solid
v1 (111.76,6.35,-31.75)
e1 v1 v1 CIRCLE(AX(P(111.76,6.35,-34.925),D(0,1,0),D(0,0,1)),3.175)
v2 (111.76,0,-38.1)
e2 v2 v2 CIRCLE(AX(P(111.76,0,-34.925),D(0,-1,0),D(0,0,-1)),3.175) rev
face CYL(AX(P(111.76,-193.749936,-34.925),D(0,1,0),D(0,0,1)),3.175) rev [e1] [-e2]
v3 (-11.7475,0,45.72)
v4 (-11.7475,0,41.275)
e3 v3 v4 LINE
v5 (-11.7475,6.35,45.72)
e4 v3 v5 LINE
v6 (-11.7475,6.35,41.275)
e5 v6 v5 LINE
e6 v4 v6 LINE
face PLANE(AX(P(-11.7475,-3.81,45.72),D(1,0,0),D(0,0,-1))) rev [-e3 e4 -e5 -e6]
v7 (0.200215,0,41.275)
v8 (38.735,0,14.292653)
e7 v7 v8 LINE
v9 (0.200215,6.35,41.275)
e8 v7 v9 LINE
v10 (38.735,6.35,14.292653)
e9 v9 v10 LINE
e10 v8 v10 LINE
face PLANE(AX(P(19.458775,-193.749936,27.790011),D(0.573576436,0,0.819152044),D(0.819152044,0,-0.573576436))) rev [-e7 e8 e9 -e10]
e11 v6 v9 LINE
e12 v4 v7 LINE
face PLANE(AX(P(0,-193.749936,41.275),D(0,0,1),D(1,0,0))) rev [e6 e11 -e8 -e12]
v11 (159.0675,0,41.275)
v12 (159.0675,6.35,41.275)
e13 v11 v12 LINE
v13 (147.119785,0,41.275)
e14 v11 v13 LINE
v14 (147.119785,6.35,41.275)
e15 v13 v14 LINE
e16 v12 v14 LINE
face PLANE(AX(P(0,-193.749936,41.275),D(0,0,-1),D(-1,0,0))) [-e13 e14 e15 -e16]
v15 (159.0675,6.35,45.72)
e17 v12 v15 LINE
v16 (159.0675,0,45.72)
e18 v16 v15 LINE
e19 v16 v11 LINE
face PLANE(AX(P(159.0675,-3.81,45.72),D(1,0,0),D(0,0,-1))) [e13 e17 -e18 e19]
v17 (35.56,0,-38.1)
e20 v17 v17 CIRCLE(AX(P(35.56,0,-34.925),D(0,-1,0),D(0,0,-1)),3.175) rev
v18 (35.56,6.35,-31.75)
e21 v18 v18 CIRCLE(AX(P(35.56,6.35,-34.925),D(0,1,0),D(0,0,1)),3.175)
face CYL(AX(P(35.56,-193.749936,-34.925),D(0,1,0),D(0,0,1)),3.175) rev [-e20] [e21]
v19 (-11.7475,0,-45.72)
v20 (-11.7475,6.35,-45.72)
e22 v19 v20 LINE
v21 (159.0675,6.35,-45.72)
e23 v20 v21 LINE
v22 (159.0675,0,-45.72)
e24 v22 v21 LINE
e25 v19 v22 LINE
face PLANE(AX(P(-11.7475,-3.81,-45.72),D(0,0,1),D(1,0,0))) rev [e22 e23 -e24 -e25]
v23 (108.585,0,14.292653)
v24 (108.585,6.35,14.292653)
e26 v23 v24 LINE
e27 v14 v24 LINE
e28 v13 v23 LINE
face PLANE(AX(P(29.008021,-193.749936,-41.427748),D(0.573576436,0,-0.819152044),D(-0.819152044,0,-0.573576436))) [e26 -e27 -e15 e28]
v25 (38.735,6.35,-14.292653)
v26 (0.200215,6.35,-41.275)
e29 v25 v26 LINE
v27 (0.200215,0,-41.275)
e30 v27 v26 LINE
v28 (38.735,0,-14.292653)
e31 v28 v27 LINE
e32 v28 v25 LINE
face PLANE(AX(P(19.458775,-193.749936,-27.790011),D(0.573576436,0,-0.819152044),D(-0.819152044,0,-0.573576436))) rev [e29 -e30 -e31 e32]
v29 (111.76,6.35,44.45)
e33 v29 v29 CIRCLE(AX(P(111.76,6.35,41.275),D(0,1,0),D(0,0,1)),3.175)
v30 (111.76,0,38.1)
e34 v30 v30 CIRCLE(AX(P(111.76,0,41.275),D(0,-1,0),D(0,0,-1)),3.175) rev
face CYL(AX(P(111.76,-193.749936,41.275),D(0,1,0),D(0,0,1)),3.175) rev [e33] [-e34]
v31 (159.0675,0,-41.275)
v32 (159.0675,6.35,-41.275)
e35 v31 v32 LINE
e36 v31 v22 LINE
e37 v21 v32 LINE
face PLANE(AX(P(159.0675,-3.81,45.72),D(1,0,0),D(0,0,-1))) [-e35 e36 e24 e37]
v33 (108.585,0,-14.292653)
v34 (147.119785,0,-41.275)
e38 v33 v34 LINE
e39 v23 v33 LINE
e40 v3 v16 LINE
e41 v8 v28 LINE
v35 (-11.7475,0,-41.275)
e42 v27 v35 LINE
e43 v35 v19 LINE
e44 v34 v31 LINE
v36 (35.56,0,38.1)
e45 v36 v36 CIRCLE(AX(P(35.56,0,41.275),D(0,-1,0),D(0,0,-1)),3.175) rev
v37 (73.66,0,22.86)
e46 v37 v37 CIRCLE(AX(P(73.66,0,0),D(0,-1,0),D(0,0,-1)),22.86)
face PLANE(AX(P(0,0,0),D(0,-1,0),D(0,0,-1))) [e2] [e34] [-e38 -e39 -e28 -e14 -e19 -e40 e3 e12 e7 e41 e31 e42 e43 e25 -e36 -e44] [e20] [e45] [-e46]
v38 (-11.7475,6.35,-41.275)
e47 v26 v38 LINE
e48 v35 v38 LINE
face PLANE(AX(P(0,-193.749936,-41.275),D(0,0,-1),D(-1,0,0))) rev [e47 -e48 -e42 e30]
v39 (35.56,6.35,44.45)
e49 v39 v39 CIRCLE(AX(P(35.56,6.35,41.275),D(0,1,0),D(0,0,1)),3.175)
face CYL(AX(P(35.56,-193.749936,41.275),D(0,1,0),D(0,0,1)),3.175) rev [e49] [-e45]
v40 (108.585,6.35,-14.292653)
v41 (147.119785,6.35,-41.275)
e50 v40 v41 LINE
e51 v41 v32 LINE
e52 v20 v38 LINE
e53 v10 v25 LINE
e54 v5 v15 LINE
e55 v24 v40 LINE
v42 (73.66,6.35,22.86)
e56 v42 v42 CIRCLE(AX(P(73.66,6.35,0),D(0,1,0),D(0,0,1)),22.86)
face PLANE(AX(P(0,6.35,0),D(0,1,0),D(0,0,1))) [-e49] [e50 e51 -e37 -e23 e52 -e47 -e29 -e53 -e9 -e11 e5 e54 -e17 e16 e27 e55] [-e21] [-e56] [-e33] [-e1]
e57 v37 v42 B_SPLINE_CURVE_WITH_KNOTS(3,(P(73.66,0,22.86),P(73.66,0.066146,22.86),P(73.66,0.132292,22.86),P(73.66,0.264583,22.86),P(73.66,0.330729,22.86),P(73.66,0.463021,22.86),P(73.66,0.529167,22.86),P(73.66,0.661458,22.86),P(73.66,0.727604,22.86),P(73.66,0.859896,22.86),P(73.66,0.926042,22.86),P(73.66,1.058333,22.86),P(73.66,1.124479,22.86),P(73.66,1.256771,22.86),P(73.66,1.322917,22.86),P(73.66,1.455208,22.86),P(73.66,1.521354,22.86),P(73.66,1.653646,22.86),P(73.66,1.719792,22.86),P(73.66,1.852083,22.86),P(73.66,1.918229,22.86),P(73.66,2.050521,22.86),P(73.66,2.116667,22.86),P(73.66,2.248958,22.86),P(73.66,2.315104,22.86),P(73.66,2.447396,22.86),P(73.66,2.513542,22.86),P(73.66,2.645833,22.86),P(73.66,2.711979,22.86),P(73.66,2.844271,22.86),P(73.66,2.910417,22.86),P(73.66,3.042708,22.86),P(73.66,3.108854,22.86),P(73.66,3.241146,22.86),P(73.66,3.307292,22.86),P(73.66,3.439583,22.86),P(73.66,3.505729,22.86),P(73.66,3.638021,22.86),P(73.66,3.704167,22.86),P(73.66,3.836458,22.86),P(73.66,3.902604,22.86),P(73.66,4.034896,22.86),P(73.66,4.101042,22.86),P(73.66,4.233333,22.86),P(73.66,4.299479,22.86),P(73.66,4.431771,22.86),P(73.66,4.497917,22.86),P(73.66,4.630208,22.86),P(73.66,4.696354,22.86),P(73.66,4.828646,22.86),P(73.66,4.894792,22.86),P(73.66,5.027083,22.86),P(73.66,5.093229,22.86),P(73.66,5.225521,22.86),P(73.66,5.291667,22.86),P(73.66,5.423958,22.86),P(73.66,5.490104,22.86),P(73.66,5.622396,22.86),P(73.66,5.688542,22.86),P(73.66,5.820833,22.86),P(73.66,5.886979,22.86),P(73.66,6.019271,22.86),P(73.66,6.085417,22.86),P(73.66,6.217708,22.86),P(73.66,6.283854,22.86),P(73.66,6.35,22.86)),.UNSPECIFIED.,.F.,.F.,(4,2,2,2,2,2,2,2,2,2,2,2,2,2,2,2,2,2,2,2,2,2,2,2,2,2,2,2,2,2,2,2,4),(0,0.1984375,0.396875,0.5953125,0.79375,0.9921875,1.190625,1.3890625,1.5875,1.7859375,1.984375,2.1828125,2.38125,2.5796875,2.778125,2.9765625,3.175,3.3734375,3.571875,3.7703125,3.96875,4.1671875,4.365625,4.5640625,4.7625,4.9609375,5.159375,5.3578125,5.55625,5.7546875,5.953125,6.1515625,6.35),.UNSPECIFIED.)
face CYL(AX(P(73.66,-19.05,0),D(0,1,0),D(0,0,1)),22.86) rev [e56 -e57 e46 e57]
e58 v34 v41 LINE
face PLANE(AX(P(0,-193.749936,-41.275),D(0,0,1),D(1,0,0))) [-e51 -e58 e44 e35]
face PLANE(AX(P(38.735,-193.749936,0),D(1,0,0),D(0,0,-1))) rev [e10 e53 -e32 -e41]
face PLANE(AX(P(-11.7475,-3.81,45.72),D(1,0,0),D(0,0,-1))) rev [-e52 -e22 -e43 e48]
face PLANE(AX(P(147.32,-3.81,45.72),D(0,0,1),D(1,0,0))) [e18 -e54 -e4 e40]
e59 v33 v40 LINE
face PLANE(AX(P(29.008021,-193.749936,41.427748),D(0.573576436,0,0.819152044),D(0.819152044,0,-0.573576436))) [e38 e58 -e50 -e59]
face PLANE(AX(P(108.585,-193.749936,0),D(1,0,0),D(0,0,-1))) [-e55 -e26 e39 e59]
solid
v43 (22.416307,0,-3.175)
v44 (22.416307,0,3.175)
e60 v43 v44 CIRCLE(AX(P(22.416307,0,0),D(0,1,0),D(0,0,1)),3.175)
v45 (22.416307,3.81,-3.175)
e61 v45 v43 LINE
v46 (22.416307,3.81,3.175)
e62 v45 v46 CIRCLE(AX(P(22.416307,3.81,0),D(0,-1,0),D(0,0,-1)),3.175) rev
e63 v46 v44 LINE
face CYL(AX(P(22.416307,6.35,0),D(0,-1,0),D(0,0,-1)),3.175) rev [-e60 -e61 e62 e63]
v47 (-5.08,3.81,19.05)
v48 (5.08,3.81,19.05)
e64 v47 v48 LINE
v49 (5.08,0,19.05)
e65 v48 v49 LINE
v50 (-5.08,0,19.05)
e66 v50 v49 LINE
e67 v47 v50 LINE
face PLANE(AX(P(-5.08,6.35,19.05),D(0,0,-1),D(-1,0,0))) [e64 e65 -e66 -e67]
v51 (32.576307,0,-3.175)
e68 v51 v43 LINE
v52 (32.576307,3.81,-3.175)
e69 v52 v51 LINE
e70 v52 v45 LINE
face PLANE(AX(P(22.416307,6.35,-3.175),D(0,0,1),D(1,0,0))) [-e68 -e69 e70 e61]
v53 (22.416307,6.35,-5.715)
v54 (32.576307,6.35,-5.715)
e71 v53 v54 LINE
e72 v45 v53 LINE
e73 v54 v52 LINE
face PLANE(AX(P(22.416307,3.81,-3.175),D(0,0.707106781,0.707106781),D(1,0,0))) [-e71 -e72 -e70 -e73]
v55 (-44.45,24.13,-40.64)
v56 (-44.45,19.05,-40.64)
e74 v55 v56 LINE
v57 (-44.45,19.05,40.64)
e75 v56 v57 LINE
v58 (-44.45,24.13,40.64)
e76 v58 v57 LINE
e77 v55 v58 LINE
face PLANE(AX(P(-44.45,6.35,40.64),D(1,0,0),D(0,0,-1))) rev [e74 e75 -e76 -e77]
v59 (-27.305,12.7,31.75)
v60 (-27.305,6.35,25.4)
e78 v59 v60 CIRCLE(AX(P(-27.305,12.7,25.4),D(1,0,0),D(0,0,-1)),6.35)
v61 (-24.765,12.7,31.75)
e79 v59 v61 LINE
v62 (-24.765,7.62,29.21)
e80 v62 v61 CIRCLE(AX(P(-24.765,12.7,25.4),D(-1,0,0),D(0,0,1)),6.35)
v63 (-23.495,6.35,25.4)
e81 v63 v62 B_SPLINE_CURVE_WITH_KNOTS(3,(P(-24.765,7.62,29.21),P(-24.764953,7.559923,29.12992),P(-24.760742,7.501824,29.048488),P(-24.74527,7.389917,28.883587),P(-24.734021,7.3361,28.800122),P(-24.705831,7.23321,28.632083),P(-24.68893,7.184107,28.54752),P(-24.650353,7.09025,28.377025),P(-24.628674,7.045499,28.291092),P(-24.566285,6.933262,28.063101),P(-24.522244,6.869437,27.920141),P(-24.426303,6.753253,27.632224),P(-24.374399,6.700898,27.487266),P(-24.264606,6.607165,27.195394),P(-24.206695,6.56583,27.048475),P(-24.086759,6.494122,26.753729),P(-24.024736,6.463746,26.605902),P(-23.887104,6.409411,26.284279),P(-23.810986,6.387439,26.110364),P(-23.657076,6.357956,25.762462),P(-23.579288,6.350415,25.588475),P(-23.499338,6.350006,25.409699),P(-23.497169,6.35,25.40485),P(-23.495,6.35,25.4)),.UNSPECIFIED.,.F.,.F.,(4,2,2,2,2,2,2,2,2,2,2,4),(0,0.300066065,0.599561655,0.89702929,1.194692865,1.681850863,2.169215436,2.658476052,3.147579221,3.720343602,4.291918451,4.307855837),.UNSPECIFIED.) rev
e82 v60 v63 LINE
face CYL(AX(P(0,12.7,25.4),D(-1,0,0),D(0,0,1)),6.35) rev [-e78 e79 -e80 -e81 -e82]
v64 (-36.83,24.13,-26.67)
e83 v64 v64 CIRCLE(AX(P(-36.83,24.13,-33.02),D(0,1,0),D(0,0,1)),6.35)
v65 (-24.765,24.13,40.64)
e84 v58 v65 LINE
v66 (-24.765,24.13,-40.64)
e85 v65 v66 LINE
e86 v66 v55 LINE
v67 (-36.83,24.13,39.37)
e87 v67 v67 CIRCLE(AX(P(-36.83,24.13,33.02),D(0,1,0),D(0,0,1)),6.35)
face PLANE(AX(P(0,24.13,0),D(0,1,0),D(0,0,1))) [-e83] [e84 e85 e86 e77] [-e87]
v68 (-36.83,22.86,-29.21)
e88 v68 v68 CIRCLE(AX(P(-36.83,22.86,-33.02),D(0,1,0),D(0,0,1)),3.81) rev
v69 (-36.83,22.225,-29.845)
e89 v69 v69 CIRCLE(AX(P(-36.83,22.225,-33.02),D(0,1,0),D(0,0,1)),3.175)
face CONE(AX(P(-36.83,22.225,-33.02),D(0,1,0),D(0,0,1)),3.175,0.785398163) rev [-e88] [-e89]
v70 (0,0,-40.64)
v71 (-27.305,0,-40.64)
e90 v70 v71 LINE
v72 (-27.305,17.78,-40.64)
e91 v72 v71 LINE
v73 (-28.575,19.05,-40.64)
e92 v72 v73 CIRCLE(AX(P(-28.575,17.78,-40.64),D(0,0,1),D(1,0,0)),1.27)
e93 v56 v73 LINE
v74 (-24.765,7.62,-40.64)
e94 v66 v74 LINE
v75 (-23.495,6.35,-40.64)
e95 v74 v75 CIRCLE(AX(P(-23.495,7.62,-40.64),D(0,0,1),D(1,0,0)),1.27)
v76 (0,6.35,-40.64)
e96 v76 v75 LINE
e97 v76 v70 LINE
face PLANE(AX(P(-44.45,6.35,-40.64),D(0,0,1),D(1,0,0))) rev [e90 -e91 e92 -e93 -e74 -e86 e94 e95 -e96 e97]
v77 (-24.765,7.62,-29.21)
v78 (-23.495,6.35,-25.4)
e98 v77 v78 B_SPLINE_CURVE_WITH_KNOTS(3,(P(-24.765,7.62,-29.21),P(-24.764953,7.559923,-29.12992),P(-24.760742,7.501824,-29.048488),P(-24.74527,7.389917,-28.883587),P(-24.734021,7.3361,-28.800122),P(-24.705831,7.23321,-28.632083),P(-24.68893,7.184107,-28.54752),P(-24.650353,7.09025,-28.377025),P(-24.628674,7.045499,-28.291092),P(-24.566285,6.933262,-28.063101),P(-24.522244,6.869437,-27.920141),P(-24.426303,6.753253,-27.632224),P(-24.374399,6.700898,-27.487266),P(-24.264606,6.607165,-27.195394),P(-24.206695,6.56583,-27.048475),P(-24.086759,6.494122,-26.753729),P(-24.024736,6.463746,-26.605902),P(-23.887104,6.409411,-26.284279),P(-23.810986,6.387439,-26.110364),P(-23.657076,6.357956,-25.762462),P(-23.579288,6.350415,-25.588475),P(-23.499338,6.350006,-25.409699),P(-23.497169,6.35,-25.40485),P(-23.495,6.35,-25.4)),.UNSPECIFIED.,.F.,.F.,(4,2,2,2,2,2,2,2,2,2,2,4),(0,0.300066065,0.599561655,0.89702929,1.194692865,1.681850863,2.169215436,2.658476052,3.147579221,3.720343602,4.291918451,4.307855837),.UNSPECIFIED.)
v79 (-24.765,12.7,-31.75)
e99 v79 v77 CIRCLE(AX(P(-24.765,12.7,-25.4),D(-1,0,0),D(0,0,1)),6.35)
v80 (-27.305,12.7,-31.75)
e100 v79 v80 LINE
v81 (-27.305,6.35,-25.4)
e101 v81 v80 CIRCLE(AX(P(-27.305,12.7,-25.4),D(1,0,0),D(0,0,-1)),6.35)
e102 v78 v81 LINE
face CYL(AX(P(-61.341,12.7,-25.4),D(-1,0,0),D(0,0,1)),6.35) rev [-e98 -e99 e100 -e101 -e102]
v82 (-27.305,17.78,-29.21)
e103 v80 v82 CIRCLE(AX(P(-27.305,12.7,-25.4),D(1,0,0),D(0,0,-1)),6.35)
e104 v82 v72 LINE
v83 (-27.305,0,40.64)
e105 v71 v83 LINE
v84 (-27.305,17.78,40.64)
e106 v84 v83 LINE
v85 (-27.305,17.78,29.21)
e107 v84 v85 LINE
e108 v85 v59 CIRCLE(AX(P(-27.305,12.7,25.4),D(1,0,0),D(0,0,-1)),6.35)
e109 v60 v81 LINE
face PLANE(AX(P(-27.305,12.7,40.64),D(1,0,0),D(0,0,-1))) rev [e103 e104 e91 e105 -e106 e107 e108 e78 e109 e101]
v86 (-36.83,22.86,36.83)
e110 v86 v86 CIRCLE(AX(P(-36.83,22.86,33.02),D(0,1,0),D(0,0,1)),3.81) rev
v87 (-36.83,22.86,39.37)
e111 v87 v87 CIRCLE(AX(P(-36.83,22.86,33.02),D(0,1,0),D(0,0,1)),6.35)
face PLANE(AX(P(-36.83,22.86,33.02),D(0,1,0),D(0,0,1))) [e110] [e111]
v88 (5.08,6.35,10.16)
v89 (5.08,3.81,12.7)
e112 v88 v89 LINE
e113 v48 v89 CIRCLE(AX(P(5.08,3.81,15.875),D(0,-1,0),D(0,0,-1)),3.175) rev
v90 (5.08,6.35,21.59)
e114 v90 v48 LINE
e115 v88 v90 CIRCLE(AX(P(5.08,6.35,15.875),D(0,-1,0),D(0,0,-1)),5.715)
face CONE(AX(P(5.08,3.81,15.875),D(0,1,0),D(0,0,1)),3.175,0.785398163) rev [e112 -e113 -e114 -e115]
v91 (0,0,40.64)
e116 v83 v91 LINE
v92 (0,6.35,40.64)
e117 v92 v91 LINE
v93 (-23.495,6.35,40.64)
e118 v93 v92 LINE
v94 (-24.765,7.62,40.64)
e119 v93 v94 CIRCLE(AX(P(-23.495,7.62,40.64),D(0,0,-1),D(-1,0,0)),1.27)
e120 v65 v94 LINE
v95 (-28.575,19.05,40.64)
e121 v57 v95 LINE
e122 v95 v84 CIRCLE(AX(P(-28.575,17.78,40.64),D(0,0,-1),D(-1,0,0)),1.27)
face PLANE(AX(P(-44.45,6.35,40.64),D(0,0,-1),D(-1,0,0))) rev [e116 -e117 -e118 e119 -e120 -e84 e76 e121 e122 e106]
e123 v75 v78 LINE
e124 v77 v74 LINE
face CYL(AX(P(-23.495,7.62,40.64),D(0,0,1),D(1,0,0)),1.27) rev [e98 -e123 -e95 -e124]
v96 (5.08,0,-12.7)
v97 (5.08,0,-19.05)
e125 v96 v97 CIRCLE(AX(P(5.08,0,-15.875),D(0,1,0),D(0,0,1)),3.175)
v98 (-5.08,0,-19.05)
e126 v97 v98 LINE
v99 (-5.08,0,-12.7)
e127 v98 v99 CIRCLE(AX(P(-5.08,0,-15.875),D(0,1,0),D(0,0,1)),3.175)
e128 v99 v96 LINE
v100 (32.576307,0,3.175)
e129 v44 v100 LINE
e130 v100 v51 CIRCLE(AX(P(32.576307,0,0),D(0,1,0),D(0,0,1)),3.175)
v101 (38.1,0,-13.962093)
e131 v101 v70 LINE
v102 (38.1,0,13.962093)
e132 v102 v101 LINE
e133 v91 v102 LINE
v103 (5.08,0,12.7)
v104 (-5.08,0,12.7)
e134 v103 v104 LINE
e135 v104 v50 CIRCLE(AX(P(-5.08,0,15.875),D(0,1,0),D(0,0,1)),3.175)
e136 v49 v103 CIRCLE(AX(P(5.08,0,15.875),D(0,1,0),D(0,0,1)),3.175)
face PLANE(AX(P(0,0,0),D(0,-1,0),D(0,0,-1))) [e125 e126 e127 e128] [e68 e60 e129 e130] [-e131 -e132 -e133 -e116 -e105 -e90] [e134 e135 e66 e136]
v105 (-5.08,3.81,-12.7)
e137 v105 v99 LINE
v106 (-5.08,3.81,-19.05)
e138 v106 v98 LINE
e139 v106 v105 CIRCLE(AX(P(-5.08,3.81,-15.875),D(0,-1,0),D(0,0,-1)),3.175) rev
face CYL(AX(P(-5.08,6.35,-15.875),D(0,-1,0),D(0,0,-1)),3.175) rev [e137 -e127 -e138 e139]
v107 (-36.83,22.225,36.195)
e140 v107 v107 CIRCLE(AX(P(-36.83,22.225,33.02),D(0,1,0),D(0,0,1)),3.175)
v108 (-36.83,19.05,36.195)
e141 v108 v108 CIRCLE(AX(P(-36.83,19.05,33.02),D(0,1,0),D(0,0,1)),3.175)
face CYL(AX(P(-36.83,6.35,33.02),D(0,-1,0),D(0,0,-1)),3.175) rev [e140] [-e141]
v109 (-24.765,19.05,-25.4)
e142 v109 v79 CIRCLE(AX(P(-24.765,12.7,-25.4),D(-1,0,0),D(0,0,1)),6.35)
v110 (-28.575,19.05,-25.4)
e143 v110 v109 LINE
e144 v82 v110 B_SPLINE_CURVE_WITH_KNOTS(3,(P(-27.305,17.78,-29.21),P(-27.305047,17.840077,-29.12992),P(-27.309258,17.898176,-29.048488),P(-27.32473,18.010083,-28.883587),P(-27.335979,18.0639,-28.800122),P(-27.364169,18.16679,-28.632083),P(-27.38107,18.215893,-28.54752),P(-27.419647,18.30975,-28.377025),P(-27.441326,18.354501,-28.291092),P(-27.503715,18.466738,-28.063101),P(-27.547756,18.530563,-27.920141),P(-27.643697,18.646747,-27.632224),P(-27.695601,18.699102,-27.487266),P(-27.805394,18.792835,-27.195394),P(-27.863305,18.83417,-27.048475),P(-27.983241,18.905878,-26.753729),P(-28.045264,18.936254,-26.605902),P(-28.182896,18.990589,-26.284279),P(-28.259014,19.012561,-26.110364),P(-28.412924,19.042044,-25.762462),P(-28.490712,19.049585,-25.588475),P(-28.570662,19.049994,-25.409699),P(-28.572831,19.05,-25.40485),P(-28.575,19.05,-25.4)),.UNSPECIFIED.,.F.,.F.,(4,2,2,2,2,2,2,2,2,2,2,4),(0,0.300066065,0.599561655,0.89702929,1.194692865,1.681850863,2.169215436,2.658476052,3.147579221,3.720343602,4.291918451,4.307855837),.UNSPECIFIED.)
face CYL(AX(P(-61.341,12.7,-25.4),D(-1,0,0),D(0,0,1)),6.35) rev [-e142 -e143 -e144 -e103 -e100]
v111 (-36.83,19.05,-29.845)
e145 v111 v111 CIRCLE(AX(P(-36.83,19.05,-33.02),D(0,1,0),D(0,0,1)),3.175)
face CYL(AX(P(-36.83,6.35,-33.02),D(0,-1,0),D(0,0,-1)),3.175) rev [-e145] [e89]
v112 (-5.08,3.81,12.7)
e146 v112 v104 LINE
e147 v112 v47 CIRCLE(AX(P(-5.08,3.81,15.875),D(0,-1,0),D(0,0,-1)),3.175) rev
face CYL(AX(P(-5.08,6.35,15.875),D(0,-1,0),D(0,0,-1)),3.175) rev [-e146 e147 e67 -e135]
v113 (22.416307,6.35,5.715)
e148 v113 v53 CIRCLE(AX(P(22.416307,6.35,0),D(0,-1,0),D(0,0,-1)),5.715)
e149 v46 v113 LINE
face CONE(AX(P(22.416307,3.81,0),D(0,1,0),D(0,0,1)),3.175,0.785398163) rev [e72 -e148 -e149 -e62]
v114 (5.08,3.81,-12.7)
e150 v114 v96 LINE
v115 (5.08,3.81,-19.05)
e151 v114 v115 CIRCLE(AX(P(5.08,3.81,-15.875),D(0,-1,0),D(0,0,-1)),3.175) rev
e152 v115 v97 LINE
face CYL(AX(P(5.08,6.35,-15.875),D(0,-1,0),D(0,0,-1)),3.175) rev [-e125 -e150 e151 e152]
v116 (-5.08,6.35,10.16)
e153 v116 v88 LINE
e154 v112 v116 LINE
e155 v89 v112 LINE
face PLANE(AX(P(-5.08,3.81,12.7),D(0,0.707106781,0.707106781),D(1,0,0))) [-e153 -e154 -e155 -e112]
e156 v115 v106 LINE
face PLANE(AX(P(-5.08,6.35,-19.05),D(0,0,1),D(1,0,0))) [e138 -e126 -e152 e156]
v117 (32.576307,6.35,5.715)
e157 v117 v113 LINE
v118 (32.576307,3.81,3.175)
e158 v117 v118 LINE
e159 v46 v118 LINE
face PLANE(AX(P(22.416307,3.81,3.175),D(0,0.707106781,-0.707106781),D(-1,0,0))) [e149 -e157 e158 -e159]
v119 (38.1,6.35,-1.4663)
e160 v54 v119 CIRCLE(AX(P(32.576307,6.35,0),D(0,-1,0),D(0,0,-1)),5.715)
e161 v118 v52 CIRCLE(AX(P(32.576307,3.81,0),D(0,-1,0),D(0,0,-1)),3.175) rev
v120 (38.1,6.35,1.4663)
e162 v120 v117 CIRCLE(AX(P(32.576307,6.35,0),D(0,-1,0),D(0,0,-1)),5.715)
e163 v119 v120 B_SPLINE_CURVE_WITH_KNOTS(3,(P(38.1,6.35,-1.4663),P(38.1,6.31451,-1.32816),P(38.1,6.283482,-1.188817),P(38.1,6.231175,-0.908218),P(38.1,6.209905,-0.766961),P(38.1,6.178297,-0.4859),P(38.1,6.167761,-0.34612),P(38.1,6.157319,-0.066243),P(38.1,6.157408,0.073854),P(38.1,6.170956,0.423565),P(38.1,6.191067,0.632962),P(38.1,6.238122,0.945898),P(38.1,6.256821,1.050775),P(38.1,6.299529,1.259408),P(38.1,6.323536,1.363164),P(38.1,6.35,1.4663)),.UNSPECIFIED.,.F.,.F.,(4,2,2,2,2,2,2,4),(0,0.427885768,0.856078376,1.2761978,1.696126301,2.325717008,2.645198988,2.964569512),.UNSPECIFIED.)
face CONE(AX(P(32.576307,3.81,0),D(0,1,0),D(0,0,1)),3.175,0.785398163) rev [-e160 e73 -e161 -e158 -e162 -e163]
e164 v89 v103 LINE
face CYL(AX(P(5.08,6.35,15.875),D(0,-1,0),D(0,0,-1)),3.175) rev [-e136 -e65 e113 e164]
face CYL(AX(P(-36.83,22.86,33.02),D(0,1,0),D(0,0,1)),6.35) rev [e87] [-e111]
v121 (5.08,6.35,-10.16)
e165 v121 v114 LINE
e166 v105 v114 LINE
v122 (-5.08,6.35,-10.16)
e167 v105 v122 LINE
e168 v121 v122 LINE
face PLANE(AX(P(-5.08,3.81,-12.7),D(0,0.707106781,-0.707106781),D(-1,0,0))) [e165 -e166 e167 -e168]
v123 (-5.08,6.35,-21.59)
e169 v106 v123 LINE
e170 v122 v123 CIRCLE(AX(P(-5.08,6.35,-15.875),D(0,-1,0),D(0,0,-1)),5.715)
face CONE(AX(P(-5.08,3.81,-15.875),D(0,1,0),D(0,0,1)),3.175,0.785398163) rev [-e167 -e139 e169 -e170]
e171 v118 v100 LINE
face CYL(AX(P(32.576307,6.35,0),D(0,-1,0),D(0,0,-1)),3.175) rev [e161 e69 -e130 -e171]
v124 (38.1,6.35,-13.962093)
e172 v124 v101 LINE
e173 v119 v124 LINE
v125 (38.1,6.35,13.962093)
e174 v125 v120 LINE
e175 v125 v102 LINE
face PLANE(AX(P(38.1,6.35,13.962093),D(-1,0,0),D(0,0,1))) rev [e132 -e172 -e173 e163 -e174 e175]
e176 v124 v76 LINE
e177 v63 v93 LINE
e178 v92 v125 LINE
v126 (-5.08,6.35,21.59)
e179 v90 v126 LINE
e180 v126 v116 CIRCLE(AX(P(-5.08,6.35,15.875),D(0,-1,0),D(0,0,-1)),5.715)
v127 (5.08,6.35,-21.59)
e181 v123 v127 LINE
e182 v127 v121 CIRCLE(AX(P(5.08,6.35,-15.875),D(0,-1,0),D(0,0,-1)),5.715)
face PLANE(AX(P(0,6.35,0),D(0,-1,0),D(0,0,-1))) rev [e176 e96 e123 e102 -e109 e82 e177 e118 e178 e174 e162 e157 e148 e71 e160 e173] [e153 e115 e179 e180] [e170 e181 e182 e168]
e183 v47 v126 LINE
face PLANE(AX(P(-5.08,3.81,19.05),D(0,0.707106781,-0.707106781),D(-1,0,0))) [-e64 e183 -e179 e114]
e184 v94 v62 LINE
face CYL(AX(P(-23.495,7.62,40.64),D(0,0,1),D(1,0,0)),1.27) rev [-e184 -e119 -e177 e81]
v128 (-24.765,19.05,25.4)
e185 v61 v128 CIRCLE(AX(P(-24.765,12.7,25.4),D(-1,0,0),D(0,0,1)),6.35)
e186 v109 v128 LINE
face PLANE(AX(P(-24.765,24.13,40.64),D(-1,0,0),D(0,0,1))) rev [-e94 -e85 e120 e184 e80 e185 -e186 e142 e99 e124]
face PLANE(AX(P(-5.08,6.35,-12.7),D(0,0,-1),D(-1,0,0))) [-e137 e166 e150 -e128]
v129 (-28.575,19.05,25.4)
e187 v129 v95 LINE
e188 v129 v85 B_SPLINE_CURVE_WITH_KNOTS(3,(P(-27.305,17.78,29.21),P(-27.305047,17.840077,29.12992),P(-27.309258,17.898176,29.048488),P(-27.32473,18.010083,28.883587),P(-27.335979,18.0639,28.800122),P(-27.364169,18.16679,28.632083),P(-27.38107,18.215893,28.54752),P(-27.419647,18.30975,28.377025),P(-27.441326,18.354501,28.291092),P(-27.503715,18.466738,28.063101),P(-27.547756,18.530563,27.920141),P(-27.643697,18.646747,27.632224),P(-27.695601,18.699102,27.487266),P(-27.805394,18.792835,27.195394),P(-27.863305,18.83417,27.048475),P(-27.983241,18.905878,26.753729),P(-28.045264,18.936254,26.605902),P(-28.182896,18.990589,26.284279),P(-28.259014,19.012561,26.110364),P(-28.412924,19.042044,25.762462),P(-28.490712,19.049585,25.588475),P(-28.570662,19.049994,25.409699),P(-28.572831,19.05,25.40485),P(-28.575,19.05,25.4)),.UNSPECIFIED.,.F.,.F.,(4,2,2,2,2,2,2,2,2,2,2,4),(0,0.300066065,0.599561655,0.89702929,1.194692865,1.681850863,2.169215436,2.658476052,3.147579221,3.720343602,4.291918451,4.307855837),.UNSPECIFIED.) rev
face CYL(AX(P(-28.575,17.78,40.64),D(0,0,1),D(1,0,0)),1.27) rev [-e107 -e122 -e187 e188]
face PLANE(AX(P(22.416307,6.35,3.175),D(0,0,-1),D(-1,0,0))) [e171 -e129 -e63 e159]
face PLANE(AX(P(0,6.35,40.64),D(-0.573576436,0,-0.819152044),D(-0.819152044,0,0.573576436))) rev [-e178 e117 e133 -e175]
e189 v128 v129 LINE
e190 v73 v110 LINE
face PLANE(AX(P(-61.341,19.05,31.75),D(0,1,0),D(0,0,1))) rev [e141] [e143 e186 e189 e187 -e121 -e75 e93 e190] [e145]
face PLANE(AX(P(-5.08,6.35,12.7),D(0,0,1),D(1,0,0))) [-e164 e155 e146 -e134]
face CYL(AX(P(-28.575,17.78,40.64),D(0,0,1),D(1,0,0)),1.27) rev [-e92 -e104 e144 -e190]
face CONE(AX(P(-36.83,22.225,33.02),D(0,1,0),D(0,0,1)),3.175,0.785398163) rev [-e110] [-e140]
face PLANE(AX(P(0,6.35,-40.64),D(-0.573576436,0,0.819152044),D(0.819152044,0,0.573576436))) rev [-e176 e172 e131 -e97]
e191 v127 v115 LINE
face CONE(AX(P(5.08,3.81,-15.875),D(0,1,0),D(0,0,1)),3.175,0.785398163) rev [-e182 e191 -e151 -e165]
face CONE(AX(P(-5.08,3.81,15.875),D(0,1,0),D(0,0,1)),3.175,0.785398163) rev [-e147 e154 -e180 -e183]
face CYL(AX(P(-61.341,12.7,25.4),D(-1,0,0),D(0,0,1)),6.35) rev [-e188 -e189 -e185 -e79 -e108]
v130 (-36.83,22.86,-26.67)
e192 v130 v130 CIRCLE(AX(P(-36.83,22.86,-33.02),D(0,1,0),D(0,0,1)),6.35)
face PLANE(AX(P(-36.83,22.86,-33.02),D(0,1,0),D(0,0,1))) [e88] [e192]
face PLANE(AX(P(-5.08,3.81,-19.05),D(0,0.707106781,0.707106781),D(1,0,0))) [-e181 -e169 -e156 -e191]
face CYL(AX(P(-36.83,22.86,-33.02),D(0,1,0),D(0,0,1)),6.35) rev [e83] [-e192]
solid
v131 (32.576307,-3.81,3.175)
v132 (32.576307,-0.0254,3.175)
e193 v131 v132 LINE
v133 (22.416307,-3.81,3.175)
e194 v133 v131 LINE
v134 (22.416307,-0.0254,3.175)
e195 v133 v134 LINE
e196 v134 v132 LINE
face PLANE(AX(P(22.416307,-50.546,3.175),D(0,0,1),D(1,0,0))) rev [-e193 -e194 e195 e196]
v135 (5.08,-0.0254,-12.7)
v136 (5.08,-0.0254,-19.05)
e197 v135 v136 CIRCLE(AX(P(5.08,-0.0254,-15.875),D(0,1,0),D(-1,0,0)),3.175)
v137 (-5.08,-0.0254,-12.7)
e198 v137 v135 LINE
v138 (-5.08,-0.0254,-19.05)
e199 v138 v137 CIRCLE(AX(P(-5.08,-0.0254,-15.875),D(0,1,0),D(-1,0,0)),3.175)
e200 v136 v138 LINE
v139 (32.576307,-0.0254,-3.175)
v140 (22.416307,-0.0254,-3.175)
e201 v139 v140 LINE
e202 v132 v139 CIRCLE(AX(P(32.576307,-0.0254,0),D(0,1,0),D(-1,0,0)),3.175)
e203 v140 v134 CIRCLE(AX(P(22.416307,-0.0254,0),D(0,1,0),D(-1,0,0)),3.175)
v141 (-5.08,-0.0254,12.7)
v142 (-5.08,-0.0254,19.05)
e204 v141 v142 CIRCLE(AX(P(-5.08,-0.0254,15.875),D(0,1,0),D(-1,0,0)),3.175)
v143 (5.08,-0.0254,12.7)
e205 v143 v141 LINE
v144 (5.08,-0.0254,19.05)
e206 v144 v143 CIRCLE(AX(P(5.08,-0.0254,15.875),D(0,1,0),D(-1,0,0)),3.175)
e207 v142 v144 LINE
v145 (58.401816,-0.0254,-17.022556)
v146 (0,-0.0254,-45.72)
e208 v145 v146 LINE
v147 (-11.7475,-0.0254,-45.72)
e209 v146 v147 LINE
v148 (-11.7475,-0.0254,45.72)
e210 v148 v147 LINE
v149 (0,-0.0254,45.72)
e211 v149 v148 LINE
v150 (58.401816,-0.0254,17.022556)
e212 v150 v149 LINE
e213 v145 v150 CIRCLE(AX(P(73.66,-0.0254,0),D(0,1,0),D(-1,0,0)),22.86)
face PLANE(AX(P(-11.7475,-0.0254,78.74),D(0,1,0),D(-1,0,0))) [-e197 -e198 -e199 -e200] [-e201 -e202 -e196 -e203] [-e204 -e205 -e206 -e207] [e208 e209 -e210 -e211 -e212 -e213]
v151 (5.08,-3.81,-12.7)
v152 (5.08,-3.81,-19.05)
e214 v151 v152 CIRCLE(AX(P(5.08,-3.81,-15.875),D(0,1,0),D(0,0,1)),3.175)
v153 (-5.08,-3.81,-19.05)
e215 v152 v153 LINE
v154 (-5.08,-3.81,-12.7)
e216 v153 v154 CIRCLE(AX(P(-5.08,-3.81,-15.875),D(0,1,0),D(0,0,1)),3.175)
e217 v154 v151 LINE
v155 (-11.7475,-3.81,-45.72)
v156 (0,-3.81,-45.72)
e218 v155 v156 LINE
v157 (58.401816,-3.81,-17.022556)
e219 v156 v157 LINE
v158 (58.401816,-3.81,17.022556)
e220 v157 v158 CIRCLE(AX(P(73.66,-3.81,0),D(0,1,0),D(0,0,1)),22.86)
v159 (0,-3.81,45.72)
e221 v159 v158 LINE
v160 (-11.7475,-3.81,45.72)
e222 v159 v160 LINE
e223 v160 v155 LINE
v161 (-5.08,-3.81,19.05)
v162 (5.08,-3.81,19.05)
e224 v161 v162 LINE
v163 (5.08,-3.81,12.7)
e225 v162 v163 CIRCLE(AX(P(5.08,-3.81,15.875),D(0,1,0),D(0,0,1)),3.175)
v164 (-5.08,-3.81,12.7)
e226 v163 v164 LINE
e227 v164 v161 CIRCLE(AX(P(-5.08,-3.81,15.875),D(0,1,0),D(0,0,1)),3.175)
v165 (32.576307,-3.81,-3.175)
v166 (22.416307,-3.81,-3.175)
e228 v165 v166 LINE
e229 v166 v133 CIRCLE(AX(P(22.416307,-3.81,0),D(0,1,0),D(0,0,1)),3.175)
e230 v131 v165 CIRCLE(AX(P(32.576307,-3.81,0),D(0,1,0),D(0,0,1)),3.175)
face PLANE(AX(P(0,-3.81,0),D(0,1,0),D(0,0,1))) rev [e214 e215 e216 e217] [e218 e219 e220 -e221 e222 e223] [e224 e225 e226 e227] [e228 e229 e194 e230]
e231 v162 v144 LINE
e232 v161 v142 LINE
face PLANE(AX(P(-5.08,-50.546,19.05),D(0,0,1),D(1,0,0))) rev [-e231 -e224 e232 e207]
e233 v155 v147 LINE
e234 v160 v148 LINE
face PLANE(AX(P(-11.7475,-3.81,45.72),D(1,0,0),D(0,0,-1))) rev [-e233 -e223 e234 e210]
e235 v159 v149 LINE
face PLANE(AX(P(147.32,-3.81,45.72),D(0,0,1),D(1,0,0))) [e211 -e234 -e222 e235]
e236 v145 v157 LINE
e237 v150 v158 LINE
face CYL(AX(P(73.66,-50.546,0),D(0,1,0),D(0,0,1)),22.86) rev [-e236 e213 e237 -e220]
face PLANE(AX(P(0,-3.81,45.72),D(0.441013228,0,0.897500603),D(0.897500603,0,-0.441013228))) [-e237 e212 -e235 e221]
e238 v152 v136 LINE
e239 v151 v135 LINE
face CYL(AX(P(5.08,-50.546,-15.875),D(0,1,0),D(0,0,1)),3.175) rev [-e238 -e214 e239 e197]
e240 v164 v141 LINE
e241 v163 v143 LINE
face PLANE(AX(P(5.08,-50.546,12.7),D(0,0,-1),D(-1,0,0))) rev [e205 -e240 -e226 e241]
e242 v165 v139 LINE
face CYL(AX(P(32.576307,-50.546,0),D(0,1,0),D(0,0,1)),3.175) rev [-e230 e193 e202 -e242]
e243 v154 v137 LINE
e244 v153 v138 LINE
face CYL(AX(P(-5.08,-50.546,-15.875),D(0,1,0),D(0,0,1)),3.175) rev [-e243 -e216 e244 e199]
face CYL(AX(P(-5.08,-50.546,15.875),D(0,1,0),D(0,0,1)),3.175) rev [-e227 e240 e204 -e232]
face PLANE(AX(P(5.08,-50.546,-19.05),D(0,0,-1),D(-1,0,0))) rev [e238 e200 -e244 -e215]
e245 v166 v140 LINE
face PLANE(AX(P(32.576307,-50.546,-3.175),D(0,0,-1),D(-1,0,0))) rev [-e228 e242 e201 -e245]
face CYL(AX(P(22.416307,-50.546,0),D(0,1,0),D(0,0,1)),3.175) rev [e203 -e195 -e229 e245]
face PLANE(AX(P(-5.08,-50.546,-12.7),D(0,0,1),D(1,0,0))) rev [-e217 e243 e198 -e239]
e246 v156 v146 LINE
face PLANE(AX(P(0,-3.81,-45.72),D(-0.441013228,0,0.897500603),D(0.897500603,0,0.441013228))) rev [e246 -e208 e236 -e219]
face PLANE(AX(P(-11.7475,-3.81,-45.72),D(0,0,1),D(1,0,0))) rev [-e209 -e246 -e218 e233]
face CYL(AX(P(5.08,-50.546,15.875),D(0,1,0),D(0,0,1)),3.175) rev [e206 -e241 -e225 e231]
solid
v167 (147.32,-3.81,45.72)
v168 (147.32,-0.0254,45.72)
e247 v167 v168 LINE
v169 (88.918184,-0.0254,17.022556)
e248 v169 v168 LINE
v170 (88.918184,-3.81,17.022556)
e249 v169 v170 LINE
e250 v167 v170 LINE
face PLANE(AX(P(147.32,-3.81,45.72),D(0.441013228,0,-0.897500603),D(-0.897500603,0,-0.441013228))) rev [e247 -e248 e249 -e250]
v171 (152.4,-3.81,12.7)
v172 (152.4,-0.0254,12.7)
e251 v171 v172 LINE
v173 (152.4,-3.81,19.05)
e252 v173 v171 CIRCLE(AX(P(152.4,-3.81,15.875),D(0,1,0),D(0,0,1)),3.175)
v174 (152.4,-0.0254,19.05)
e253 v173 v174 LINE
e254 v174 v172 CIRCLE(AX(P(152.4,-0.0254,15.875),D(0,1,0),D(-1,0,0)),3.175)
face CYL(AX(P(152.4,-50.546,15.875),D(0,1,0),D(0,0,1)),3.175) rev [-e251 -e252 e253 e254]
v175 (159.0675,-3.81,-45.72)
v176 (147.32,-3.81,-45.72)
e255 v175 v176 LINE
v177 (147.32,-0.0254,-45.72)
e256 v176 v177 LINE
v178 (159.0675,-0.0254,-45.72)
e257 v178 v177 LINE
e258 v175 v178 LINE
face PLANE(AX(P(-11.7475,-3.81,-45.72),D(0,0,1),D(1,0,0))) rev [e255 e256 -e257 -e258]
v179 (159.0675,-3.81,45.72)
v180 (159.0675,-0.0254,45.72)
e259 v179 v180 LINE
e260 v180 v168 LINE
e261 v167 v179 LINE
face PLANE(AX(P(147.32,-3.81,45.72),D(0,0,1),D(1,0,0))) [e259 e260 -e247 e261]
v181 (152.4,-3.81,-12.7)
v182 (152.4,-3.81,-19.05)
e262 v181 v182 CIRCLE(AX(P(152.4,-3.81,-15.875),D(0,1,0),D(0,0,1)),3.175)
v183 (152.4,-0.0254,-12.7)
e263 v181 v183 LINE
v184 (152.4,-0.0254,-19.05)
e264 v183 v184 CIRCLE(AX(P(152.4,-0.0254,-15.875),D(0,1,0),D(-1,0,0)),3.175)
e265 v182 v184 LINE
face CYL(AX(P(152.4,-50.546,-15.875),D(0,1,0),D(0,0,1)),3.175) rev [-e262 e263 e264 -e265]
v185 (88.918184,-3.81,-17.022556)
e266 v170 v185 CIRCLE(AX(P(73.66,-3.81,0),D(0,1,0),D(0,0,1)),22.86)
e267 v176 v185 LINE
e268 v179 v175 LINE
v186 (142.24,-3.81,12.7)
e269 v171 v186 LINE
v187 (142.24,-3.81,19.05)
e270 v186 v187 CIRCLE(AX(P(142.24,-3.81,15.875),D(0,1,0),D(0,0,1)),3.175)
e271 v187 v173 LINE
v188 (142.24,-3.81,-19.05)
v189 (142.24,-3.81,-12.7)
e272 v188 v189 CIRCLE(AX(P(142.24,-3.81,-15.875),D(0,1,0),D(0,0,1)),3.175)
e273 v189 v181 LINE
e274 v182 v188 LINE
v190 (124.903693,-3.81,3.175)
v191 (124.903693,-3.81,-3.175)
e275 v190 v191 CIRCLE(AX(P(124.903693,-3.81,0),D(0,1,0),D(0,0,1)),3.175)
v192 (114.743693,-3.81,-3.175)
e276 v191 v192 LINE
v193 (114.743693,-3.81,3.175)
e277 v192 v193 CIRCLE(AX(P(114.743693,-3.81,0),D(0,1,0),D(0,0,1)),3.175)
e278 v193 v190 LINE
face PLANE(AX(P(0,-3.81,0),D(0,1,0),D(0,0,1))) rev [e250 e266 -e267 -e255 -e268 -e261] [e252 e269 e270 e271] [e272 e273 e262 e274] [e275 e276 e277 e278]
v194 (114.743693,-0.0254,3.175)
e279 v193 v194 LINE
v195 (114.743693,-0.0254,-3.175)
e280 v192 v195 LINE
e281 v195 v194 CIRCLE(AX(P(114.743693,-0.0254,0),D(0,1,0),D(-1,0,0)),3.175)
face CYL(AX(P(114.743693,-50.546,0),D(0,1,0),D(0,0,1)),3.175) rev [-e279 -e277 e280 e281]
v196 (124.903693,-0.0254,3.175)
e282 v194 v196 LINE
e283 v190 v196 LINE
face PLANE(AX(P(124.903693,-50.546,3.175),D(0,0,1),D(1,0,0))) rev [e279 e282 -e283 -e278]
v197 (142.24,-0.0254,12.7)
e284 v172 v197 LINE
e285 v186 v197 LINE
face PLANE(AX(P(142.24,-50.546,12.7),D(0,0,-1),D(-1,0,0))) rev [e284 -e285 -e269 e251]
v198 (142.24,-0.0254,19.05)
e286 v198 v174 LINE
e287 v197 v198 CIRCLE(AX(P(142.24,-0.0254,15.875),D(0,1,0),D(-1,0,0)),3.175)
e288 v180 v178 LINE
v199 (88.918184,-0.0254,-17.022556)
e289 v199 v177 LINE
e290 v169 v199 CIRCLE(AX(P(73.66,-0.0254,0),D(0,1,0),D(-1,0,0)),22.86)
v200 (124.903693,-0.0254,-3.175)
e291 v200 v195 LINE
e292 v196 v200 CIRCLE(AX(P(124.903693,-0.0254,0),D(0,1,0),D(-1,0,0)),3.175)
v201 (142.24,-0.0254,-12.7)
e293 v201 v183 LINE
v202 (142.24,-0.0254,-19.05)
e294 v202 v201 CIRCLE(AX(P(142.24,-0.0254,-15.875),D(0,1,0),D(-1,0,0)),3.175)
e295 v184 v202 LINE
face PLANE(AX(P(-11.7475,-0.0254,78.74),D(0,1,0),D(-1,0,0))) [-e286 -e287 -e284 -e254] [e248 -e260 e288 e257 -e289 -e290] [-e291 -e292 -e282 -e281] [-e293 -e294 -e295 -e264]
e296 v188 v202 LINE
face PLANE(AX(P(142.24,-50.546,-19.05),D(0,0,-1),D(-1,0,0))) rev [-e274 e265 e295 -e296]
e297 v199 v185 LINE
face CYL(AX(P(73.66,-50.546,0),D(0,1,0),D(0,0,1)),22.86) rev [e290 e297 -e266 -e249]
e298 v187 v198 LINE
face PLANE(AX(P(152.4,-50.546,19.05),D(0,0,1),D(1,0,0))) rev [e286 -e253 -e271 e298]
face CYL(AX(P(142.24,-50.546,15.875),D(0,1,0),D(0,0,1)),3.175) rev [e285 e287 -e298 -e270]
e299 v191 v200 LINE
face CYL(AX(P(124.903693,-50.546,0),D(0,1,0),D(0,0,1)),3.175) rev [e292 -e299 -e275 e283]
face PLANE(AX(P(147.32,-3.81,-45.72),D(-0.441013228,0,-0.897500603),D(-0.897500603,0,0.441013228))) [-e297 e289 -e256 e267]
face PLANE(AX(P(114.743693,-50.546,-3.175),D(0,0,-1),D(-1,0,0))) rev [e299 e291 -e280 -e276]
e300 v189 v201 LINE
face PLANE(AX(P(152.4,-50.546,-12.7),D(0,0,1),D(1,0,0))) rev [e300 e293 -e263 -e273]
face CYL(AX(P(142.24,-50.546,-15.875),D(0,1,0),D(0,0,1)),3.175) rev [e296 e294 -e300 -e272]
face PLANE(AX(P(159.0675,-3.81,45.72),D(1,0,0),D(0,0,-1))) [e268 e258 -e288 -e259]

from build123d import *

# Parameters (mm, degrees)
SKETCH1_R                = 3.175
BOSS_EXTRUDE1_DEPTH      = 6.35
SKETCH10_W               = 19.685
SKETCH10_H               = 81.28
SKETCH10_R               = 3.175
BOSS_EXTRUDE4_DEPTH      = 17.78
SKETCH12_W               = 17.145
SKETCH12_H               = 81.28
CUT_EXTRUDE5_DEPTH       = 12.7
SKETCH14_R               = 6.35
CUT_EXTRUDE9_DEPTH       = 1.27
CHAMFER2_SIZE            = 0.635
SKETCH15_W               = 63.5
SKETCH15_H               = 12.7
CUT_EXTRUDE10_DEPTH      = 36.576
SKETCH16_W               = 17.145
SKETCH16_H               = 6.35
CUT_EXTRUDE11_DEPTH      = 84.836
FILLET1_R                = 1.27
FILLET2_START            = -31.75
FILLET2_DEPTH            = 6.3500001
FILLET2_START_2          = 25.3999999
FILLET2_2_DEPTH          = 6.3500001
FILLET2_START_3          = -30
FILLET2_3_DEPTH          = 6.505
SKETCH18_R               = 3.175
BOSS_EXTRUDE5_DEPTH      = 6.35
SKETCH19_R               = 22.86
CUT_EXTRUDE12_DEPTH      = 25.4
BOSS_EXTRUDE6_DEPTH      = 3.81
CUT_EXTRUDE13_DEPTH      = 78.74
CUT_EXTRUDE13_DEPTH_BACK = 56.896
SKETCH21_W               = 170.815
SKETCH21_H               = 0.0254
CUT_EXTRUDE15_DEPTH      = 56.896
SKETCH24_R               = 22.86
CUT_EXTRUDE16_DEPTH      = 56.896


with BuildPart() as part:
    # Sketch1 → Boss-Extrude1 (new body)
    with BuildSketch(Plane(origin=(0, 0, 0), x_dir=(1, 0, 0), z_dir=(0, 1, 0))):
        Polygon((0, 40.64), (38.1, 13.962092794), (38.1, -13.962092794), (0, -40.64), (-44.45, -40.64), (-44.45, 40.64), align=None)
        with Locations(Location((-36.83, 33.02, 0), (0, 0, 270))):
            Circle(SKETCH1_R, mode=Mode.SUBTRACT)
        with Locations(Location((-36.83, -33.02, 0), (0, 0, 270))):
            Circle(SKETCH1_R, mode=Mode.SUBTRACT)
        with BuildLine():
            Line((-5.08, 19.05), (5.08, 19.05))
            ThreePointArc((5.08, 19.05), (8.255, 15.875), (5.08, 12.7))
            Line((5.08, 12.7), (-5.08, 12.7))
            ThreePointArc((-5.08, 12.7), (-8.255, 15.875), (-5.08, 19.05))
        make_face(mode=Mode.SUBTRACT)
        with BuildLine():
            Line((-5.08, -12.7), (5.08, -12.7))
            ThreePointArc((5.08, -12.7), (8.255, -15.875), (5.08, -19.05))
            Line((5.08, -19.05), (-5.08, -19.05))
            ThreePointArc((-5.08, -19.05), (-8.255, -15.875), (-5.08, -12.7))
        make_face(mode=Mode.SUBTRACT)
        with BuildLine():
            Line((22.41630657, 3.175), (32.57630657, 3.175))
            ThreePointArc((32.57630657, 3.175), (35.75130657, 0), (32.57630657, -3.175))
            Line((32.57630657, -3.175), (22.41630657, -3.175))
            ThreePointArc((22.41630657, -3.175), (19.24130657, 0), (22.41630657, 3.175))
        make_face(mode=Mode.SUBTRACT)
    extrude(amount=BOSS_EXTRUDE1_DEPTH)

    # Sketch10 → Boss-Extrude4 (add)
    with BuildSketch(Plane(origin=(0, 6.35, 0), x_dir=(1, 0, 0), z_dir=(0, 1, 0))):
        with Locations((-34.6075, 0)):
            Rectangle(SKETCH10_W, SKETCH10_H)
        with Locations(Location((-36.83, -33.02, 0), (0, 0, 270))):
            Circle(SKETCH10_R, mode=Mode.SUBTRACT)
        with Locations(Location((-36.83, 33.02, 0), (0, 0, 270))):
            Circle(SKETCH10_R, mode=Mode.SUBTRACT)
    extrude(amount=BOSS_EXTRUDE4_DEPTH)

    # Sketch12 → Cut-Extrude5 (cut)
    with BuildSketch(Plane.XZ):
        with Locations((-35.8775, 0)):
            Rectangle(SKETCH12_W, SKETCH12_H)
    extrude(amount=-CUT_EXTRUDE5_DEPTH, mode=Mode.SUBTRACT)

    # Sketch14 → Cut-Extrude9 (cut)
    with BuildSketch(Plane(origin=(0, 24.13, 0), x_dir=(1, 0, 0), z_dir=(0, 1, 0))):
        with Locations(Location((-36.83, 33.02, 0), (0, 0, 270))):
            Circle(SKETCH14_R)
        with Locations(Location((-36.83, -33.02, 0), (0, 0, 270))):
            Circle(SKETCH14_R)
    extrude(amount=-CUT_EXTRUDE9_DEPTH, mode=Mode.SUBTRACT)

    # Chamfer2
    chamfer2_edges = [part.edges().sort_by_distance(p)[0] for p in [
        (-36.83, 22.86, -36.195),
        (-36.83, 22.86, 29.845),
    ]]
    chamfer(chamfer2_edges, length=CHAMFER2_SIZE)

    # Sketch15 → Cut-Extrude10 (cut)
    with BuildSketch(Plane(origin=(-24.765, 0, 0), x_dir=(0, 0, -1), z_dir=(1, 0, 0))):
        with Locations((0, 12.7)):
            Rectangle(SKETCH15_W, SKETCH15_H)
    extrude(amount=-CUT_EXTRUDE10_DEPTH, mode=Mode.SUBTRACT)

    # Sketch16 → Cut-Extrude11 (cut)
    with BuildSketch(Plane(origin=(0, 0, -40.64), x_dir=(-1, 0, 0), z_dir=(0, 0, -1))):
        with Locations((35.8775, 15.875)):
            Rectangle(SKETCH16_W, SKETCH16_H)
    extrude(amount=-CUT_EXTRUDE11_DEPTH, mode=Mode.SUBTRACT)

    # Fillet1
    fillet1_edges = [part.edges().sort_by_distance(p)[0] for p in [
        (-24.765, 6.35, -36.195),
        (-27.305, 19.05, 36.195),
        (-27.305, 19.05, -36.195),
        (-24.765, 6.35, 36.195),
    ]]
    fillet(fillet1_edges, radius=FILLET1_R)

    # Fillet2: read off the stored shape, not the designer's step
    # Fillet2 outline → Fillet2 (add)
    with BuildSketch(Plane.XY.offset(FILLET2_START)):
        with BuildLine():
            ThreePointArc((-23.495, 6.35), (-24.393025612, 6.721974388), (-24.765, 7.62))
            Line((-24.765, 7.62), (-24.765, 19.05))
            Line((-24.765, 19.05), (-28.575, 19.05))
            ThreePointArc((-28.575, 19.05), (-27.676974388, 18.678025612), (-27.305, 17.78))
            Line((-27.305, 17.78), (-27.305, 6.35))
            Line((-27.305, 6.35), (-23.495, 6.35))
        make_face()
    extrude(amount=FILLET2_DEPTH)

    # Fillet2 2 outline → Fillet2 2 (add)
    with BuildSketch(Plane.XY.offset(FILLET2_START_2)):
        with BuildLine():
            ThreePointArc((-23.495, 6.35), (-24.393025612, 6.721974388), (-24.765, 7.62))
            Line((-24.765, 7.62), (-24.765, 19.05))
            Line((-24.765, 19.05), (-28.575, 19.05))
            ThreePointArc((-28.575, 19.05), (-27.676974388, 18.678025612), (-27.305, 17.78))
            Line((-27.305, 17.78), (-27.305, 6.35))
            Line((-27.305, 6.35), (-23.495, 6.35))
        make_face()
    extrude(amount=FILLET2_2_DEPTH)

    # Fillet2 3 outline → Fillet2 3 (cut)
    with BuildSketch(Plane.YZ.offset(FILLET2_START_3)):
        with BuildLine():
            ThreePointArc((19.05, 25.4), (17.190128061, 29.890128061), (12.7, 31.75))
            ThreePointArc((12.7, 31.75), (8.209871939, 29.890128061), (6.35, 25.4))
            Line((6.35, 25.4), (19.05, 25.4))
        make_face()
        with BuildLine():
            ThreePointArc((12.7, -31.75), (17.190128061, -29.890128061), (19.05, -25.4))
            Line((19.05, -25.4), (6.35, -25.4))
            ThreePointArc((6.35, -25.4), (8.209871939, -29.890128061), (12.7, -31.75))
        make_face()
    extrude(amount=FILLET2_3_DEPTH, mode=Mode.SUBTRACT)

    # Chamfer3: read off the stored shape, not the designer's step
    # Chamfer3: loft between two sections, ruled curve by curve
    chamfer3_from = [
        Edge.make_three_point_arc((-5.08, 3.81, 12.7), (-7.32506403, 3.81, 13.62993597), (-8.255, 3.81, 15.875)),
        Edge.make_three_point_arc((-8.255, 3.81, 15.875), (-7.32506403, 3.81, 18.12006403), (-5.08, 3.81, 19.05)),
        Edge.make_three_point_arc((5.08, 3.81, 19.05), (7.32506403, 3.81, 18.12006403), (8.255, 3.81, 15.875)),
        Edge.make_three_point_arc((8.255, 3.81, 15.875), (7.32506403, 3.81, 13.62993597), (5.08, 3.81, 12.7)),
        Edge.make_line((5.08, 3.81, 12.7), (-5.08, 3.81, 12.7)),
        Edge.make_line((-5.08, 3.81, 19.05), (5.08, 3.81, 19.05)),
    ]
    chamfer3_to = [
        Edge.make_three_point_arc((-5.08, 6.35, 10.16), (-9.121115254, 6.35, 11.833884746), (-10.795, 6.35, 15.875)),
        Edge.make_three_point_arc((-10.795, 6.35, 15.875), (-9.121115254, 6.35, 19.916115254), (-5.08, 6.35, 21.59)),
        Edge.make_three_point_arc((5.08, 6.35, 21.59), (9.121115254, 6.35, 19.916115254), (10.795, 6.35, 15.875)),
        Edge.make_three_point_arc((10.795, 6.35, 15.875), (9.121115254, 6.35, 11.833884746), (5.08, 6.35, 10.16)),
        Edge.make_line((5.08, 6.35, 10.16), (-5.08, 6.35, 10.16)),
        Edge.make_line((-5.08, 6.35, 21.59), (5.08, 6.35, 21.59)),
    ]
    chamfer3 = Solid(Shell([*[Face.make_surface_from_curves(chamfer3_from[k], chamfer3_to[k]) for k in range(6)], Face(Wire(chamfer3_from)), Face(Wire(chamfer3_to))]))
    add(chamfer3, mode=Mode.SUBTRACT)

    # Chamfer3 2: loft between two sections, ruled curve by curve
    chamfer3_2_from = [
        Edge.make_three_point_arc((22.41630657, 3.81, -3.175), (20.17124254, 3.81, -2.24506403), (19.24130657, 3.81, 0)),
        Edge.make_three_point_arc((19.24130657, 3.81, 0), (20.17124254, 3.81, 2.24506403), (22.41630657, 3.81, 3.175)),
        Edge.make_three_point_arc((32.57630657, 3.81, 3.175), (34.8213706, 3.81, 2.24506403), (35.75130657, 3.81, 0)),
        Edge.make_three_point_arc((35.75130657, 3.81, 0), (34.8213706, 3.81, -2.24506403), (32.57630657, 3.81, -3.175)),
        Edge.make_line((32.57630657, 3.81, -3.175), (22.41630657, 3.81, -3.175)),
        Edge.make_line((22.41630657, 3.81, 3.175), (32.57630657, 3.81, 3.175)),
    ]
    chamfer3_2_to = [
        Edge.make_three_point_arc((22.41630657, 6.35, -5.715), (18.375191316, 6.35, -4.041115254), (16.70130657, 6.35, 0)),
        Edge.make_three_point_arc((16.70130657, 6.35, 0), (18.375191316, 6.35, 4.041115254), (22.41630657, 6.35, 5.715)),
        Edge.make_three_point_arc((32.57630657, 6.35, 5.715), (36.617421825, 6.35, 4.041115254), (38.29130657, 6.35, 0)),
        Edge.make_three_point_arc((38.29130657, 6.35, 0), (36.617421825, 6.35, -4.041115254), (32.57630657, 6.35, -5.715)),
        Edge.make_line((32.57630657, 6.35, -5.715), (22.41630657, 6.35, -5.715)),
        Edge.make_line((22.41630657, 6.35, 5.715), (32.57630657, 6.35, 5.715)),
    ]
    chamfer3_2 = Solid(Shell([*[Face.make_surface_from_curves(chamfer3_2_from[k], chamfer3_2_to[k]) for k in range(6)], Face(Wire(chamfer3_2_from)), Face(Wire(chamfer3_2_to))]))
    add(chamfer3_2, mode=Mode.SUBTRACT)

    # Chamfer3 3: loft between two sections, ruled curve by curve
    chamfer3_3_from = [
        Edge.make_three_point_arc((-5.08, 3.81, -19.05), (-7.32506403, 3.81, -18.12006403), (-8.255, 3.81, -15.875)),
        Edge.make_three_point_arc((-8.255, 3.81, -15.875), (-7.32506403, 3.81, -13.62993597), (-5.08, 3.81, -12.7)),
        Edge.make_three_point_arc((5.08, 3.81, -12.7), (7.32506403, 3.81, -13.62993597), (8.255, 3.81, -15.875)),
        Edge.make_three_point_arc((8.255, 3.81, -15.875), (7.32506403, 3.81, -18.12006403), (5.08, 3.81, -19.05)),
        Edge.make_line((5.08, 3.81, -19.05), (-5.08, 3.81, -19.05)),
        Edge.make_line((-5.08, 3.81, -12.7), (5.08, 3.81, -12.7)),
    ]
    chamfer3_3_to = [
        Edge.make_three_point_arc((-5.08, 6.35, -21.59), (-9.121115254, 6.35, -19.916115254), (-10.795, 6.35, -15.875)),
        Edge.make_three_point_arc((-10.795, 6.35, -15.875), (-9.121115254, 6.35, -11.833884746), (-5.08, 6.35, -10.16)),
        Edge.make_three_point_arc((5.08, 6.35, -10.16), (9.121115254, 6.35, -11.833884746), (10.795, 6.35, -15.875)),
        Edge.make_three_point_arc((10.795, 6.35, -15.875), (9.121115254, 6.35, -19.916115254), (5.08, 6.35, -21.59)),
        Edge.make_line((5.08, 6.35, -21.59), (-5.08, 6.35, -21.59)),
        Edge.make_line((-5.08, 6.35, -10.16), (5.08, 6.35, -10.16)),
    ]
    chamfer3_3 = Solid(Shell([*[Face.make_surface_from_curves(chamfer3_3_from[k], chamfer3_3_to[k]) for k in range(6)], Face(Wire(chamfer3_3_from)), Face(Wire(chamfer3_3_to))]))
    add(chamfer3_3, mode=Mode.SUBTRACT)



with BuildPart() as body_2:
    # Sketch18 → Boss-Extrude5 (new body)
    with BuildSketch(Plane(origin=(0, 6.35, 0), x_dir=(1, 0, 0), z_dir=(0, 1, 0))):
        Polygon((159.0675, -41.275), (159.0675, -45.72), (-11.7475, -45.72), (-11.7475, -41.275), (0.200214731, -41.275), (38.735, -14.292652871), (38.735, -1.466300069), (38.735, 1.466300069), (38.735, 14.292652871), (0.200214731, 41.275), (-11.7475, 41.275), (-11.7475, 45.72), (159.0675, 45.72), (159.0675, 41.275), (147.119785269, 41.275), (108.585, 14.292652871), (108.585, 1.466300069), (108.585, -1.466300069), (108.585, -14.292652871), (147.119785269, -41.275), align=None)
        with Locations(Location((111.76, -41.275, 0), (0, 0, 270))):
            Circle(SKETCH18_R, mode=Mode.SUBTRACT)
        with Locations(Location((35.56, -41.275, 0), (0, 0, 270))):
            Circle(SKETCH18_R, mode=Mode.SUBTRACT)
        with Locations(Location((111.76, 34.925, 0), (0, 0, 270))):
            Circle(SKETCH18_R, mode=Mode.SUBTRACT)
        with Locations(Location((35.56, 34.925, 0), (0, 0, 270))):
            Circle(SKETCH18_R, mode=Mode.SUBTRACT)
    extrude(amount=-BOSS_EXTRUDE5_DEPTH)

    # Sketch19 → Cut-Extrude12 (cut)
    with BuildSketch(Plane(origin=(0, 6.35, 0), x_dir=(1, 0, 0), z_dir=(0, 1, 0))):
        with Locations(Location((73.66, 0, 0), (0, 0, 270))):
            Circle(SKETCH19_R)
    extrude(amount=-CUT_EXTRUDE12_DEPTH, mode=Mode.SUBTRACT)


with BuildPart() as part_1:
    add(part.part)

    add(body_2.part)  # Boss-Extrude6 merges body 2
    # Sketch20 → Boss-Extrude6 (add)
    with BuildSketch(Plane.XZ):
        Polygon((-11.7475, 45.72), (-11.7475, -45.72), (0, -45.72), (73.66, -9.525), (147.32, -45.72), (159.0675, -45.72), (159.0675, 45.72), (147.32, 45.72), (73.66, 9.525), (0, 45.72), align=None)
    extrude(amount=BOSS_EXTRUDE6_DEPTH)

    # Sketch21 → Cut-Extrude13 (cut, two sides: drawn at the far end of the back side and taken through both)
    with BuildSketch(Plane.XY.offset(-CUT_EXTRUDE13_DEPTH_BACK)):
        with Locations((73.66, -0.0127)):
            Rectangle(SKETCH21_W, SKETCH21_H)
    extrude(amount=CUT_EXTRUDE13_DEPTH + CUT_EXTRUDE13_DEPTH_BACK, mode=Mode.SUBTRACT)


with BuildPart() as cut_extrude13_piece_1:
    # of the separate pieces the step leaves, piece 1, a body of its own (cut_extrude13_pieces)
    add(part_1.part.solids().sort_by_distance((-11.7475, 6.35, 41.275))[0])


with BuildPart() as cut_extrude13_piece_2:
    # of the separate pieces the step leaves, piece 2, a body of its own (cut_extrude13_pieces)
    add(part_1.part.solids().sort_by_distance((-11.7475, -3.81, 45.72))[0])

    # Sketch23 → Cut-Extrude15 (cut)
    with BuildSketch(Plane(origin=(0, 6.35, 0), x_dir=(1, 0, 0), z_dir=(0, 1, 0))):
        with BuildLine():
            Line((-5.08, -19.05), (5.08, -19.05))
            ThreePointArc((5.08, -19.05), (8.255, -15.875), (5.08, -12.7))
            Line((5.08, -12.7), (-5.08, -12.7))
            ThreePointArc((-5.08, -12.7), (-8.255, -15.875), (-5.08, -19.05))
        make_face()
        with BuildLine():
            Line((22.41630657, -3.175), (32.57630657, -3.175))
            ThreePointArc((32.57630657, -3.175), (35.75130657, 0), (32.57630657, 3.175))
            Line((32.57630657, 3.175), (22.41630657, 3.175))
            ThreePointArc((22.41630657, 3.175), (19.24130657, 0), (22.41630657, -3.175))
        make_face()
        with BuildLine():
            Line((-5.08, 12.7), (5.08, 12.7))
            ThreePointArc((5.08, 12.7), (8.255, 15.875), (5.08, 19.05))
            Line((5.08, 19.05), (-5.08, 19.05))
            ThreePointArc((-5.08, 19.05), (-8.255, 15.875), (-5.08, 12.7))
        make_face()
        with BuildLine():
            Line((142.24, -12.7), (152.4, -12.7))
            ThreePointArc((152.4, -12.7), (155.575, -15.875), (152.4, -19.05))
            Line((152.4, -19.05), (142.24, -19.05))
            ThreePointArc((142.24, -19.05), (139.065, -15.875), (142.24, -12.7))
        make_face()
        with BuildLine():
            Line((114.74369343, 3.175), (124.90369343, 3.175))
            ThreePointArc((124.90369343, 3.175), (128.07869343, 0), (124.90369343, -3.175))
            Line((124.90369343, -3.175), (114.74369343, -3.175))
            ThreePointArc((114.74369343, -3.175), (111.56869343, 0), (114.74369343, 3.175))
        make_face()
        with BuildLine():
            Line((142.24, 19.05), (152.4, 19.05))
            ThreePointArc((152.4, 19.05), (155.575, 15.875), (152.4, 12.7))
            Line((152.4, 12.7), (142.24, 12.7))
            ThreePointArc((142.24, 12.7), (139.065, 15.875), (142.24, 19.05))
        make_face()
    extrude(amount=-CUT_EXTRUDE15_DEPTH, mode=Mode.SUBTRACT)

    # Sketch24 → Cut-Extrude16 (cut)
    with BuildSketch(Plane(origin=(0, 6.35, 0), x_dir=(1, 0, 0), z_dir=(0, 1, 0))):
        with Locations(Location((73.66, 0, 0), (0, 0, 270))):
            Circle(SKETCH24_R)
    extrude(amount=-CUT_EXTRUDE16_DEPTH, mode=Mode.SUBTRACT)


with BuildPart() as cut_extrude13_piece_3:
    # of the separate pieces the step leaves, piece 3, a body of its own (cut_extrude13_pieces)
    add(part_1.part.solids().sort_by_distance((-23.495, 6.35, 40.64))[0])


with BuildPart() as cut_extrude16_piece_1:
    # of the separate pieces the step leaves, piece 1, a body of its own (cut_extrude16_pieces)
    add(cut_extrude13_piece_2.part.solids().sort_by_distance((-11.7475, -3.81, 45.72))[0])


with BuildPart() as cut_extrude16_piece_2:
    # of the separate pieces the step leaves, piece 2, a body of its own (cut_extrude16_pieces)
    add(cut_extrude13_piece_2.part.solids().sort_by_distance((147.32, -0.0254, -45.72))[0])


solid = Compound([cut_extrude13_piece_1.part, cut_extrude13_piece_3.part, cut_extrude16_piece_1.part, cut_extrude16_piece_2.part])
